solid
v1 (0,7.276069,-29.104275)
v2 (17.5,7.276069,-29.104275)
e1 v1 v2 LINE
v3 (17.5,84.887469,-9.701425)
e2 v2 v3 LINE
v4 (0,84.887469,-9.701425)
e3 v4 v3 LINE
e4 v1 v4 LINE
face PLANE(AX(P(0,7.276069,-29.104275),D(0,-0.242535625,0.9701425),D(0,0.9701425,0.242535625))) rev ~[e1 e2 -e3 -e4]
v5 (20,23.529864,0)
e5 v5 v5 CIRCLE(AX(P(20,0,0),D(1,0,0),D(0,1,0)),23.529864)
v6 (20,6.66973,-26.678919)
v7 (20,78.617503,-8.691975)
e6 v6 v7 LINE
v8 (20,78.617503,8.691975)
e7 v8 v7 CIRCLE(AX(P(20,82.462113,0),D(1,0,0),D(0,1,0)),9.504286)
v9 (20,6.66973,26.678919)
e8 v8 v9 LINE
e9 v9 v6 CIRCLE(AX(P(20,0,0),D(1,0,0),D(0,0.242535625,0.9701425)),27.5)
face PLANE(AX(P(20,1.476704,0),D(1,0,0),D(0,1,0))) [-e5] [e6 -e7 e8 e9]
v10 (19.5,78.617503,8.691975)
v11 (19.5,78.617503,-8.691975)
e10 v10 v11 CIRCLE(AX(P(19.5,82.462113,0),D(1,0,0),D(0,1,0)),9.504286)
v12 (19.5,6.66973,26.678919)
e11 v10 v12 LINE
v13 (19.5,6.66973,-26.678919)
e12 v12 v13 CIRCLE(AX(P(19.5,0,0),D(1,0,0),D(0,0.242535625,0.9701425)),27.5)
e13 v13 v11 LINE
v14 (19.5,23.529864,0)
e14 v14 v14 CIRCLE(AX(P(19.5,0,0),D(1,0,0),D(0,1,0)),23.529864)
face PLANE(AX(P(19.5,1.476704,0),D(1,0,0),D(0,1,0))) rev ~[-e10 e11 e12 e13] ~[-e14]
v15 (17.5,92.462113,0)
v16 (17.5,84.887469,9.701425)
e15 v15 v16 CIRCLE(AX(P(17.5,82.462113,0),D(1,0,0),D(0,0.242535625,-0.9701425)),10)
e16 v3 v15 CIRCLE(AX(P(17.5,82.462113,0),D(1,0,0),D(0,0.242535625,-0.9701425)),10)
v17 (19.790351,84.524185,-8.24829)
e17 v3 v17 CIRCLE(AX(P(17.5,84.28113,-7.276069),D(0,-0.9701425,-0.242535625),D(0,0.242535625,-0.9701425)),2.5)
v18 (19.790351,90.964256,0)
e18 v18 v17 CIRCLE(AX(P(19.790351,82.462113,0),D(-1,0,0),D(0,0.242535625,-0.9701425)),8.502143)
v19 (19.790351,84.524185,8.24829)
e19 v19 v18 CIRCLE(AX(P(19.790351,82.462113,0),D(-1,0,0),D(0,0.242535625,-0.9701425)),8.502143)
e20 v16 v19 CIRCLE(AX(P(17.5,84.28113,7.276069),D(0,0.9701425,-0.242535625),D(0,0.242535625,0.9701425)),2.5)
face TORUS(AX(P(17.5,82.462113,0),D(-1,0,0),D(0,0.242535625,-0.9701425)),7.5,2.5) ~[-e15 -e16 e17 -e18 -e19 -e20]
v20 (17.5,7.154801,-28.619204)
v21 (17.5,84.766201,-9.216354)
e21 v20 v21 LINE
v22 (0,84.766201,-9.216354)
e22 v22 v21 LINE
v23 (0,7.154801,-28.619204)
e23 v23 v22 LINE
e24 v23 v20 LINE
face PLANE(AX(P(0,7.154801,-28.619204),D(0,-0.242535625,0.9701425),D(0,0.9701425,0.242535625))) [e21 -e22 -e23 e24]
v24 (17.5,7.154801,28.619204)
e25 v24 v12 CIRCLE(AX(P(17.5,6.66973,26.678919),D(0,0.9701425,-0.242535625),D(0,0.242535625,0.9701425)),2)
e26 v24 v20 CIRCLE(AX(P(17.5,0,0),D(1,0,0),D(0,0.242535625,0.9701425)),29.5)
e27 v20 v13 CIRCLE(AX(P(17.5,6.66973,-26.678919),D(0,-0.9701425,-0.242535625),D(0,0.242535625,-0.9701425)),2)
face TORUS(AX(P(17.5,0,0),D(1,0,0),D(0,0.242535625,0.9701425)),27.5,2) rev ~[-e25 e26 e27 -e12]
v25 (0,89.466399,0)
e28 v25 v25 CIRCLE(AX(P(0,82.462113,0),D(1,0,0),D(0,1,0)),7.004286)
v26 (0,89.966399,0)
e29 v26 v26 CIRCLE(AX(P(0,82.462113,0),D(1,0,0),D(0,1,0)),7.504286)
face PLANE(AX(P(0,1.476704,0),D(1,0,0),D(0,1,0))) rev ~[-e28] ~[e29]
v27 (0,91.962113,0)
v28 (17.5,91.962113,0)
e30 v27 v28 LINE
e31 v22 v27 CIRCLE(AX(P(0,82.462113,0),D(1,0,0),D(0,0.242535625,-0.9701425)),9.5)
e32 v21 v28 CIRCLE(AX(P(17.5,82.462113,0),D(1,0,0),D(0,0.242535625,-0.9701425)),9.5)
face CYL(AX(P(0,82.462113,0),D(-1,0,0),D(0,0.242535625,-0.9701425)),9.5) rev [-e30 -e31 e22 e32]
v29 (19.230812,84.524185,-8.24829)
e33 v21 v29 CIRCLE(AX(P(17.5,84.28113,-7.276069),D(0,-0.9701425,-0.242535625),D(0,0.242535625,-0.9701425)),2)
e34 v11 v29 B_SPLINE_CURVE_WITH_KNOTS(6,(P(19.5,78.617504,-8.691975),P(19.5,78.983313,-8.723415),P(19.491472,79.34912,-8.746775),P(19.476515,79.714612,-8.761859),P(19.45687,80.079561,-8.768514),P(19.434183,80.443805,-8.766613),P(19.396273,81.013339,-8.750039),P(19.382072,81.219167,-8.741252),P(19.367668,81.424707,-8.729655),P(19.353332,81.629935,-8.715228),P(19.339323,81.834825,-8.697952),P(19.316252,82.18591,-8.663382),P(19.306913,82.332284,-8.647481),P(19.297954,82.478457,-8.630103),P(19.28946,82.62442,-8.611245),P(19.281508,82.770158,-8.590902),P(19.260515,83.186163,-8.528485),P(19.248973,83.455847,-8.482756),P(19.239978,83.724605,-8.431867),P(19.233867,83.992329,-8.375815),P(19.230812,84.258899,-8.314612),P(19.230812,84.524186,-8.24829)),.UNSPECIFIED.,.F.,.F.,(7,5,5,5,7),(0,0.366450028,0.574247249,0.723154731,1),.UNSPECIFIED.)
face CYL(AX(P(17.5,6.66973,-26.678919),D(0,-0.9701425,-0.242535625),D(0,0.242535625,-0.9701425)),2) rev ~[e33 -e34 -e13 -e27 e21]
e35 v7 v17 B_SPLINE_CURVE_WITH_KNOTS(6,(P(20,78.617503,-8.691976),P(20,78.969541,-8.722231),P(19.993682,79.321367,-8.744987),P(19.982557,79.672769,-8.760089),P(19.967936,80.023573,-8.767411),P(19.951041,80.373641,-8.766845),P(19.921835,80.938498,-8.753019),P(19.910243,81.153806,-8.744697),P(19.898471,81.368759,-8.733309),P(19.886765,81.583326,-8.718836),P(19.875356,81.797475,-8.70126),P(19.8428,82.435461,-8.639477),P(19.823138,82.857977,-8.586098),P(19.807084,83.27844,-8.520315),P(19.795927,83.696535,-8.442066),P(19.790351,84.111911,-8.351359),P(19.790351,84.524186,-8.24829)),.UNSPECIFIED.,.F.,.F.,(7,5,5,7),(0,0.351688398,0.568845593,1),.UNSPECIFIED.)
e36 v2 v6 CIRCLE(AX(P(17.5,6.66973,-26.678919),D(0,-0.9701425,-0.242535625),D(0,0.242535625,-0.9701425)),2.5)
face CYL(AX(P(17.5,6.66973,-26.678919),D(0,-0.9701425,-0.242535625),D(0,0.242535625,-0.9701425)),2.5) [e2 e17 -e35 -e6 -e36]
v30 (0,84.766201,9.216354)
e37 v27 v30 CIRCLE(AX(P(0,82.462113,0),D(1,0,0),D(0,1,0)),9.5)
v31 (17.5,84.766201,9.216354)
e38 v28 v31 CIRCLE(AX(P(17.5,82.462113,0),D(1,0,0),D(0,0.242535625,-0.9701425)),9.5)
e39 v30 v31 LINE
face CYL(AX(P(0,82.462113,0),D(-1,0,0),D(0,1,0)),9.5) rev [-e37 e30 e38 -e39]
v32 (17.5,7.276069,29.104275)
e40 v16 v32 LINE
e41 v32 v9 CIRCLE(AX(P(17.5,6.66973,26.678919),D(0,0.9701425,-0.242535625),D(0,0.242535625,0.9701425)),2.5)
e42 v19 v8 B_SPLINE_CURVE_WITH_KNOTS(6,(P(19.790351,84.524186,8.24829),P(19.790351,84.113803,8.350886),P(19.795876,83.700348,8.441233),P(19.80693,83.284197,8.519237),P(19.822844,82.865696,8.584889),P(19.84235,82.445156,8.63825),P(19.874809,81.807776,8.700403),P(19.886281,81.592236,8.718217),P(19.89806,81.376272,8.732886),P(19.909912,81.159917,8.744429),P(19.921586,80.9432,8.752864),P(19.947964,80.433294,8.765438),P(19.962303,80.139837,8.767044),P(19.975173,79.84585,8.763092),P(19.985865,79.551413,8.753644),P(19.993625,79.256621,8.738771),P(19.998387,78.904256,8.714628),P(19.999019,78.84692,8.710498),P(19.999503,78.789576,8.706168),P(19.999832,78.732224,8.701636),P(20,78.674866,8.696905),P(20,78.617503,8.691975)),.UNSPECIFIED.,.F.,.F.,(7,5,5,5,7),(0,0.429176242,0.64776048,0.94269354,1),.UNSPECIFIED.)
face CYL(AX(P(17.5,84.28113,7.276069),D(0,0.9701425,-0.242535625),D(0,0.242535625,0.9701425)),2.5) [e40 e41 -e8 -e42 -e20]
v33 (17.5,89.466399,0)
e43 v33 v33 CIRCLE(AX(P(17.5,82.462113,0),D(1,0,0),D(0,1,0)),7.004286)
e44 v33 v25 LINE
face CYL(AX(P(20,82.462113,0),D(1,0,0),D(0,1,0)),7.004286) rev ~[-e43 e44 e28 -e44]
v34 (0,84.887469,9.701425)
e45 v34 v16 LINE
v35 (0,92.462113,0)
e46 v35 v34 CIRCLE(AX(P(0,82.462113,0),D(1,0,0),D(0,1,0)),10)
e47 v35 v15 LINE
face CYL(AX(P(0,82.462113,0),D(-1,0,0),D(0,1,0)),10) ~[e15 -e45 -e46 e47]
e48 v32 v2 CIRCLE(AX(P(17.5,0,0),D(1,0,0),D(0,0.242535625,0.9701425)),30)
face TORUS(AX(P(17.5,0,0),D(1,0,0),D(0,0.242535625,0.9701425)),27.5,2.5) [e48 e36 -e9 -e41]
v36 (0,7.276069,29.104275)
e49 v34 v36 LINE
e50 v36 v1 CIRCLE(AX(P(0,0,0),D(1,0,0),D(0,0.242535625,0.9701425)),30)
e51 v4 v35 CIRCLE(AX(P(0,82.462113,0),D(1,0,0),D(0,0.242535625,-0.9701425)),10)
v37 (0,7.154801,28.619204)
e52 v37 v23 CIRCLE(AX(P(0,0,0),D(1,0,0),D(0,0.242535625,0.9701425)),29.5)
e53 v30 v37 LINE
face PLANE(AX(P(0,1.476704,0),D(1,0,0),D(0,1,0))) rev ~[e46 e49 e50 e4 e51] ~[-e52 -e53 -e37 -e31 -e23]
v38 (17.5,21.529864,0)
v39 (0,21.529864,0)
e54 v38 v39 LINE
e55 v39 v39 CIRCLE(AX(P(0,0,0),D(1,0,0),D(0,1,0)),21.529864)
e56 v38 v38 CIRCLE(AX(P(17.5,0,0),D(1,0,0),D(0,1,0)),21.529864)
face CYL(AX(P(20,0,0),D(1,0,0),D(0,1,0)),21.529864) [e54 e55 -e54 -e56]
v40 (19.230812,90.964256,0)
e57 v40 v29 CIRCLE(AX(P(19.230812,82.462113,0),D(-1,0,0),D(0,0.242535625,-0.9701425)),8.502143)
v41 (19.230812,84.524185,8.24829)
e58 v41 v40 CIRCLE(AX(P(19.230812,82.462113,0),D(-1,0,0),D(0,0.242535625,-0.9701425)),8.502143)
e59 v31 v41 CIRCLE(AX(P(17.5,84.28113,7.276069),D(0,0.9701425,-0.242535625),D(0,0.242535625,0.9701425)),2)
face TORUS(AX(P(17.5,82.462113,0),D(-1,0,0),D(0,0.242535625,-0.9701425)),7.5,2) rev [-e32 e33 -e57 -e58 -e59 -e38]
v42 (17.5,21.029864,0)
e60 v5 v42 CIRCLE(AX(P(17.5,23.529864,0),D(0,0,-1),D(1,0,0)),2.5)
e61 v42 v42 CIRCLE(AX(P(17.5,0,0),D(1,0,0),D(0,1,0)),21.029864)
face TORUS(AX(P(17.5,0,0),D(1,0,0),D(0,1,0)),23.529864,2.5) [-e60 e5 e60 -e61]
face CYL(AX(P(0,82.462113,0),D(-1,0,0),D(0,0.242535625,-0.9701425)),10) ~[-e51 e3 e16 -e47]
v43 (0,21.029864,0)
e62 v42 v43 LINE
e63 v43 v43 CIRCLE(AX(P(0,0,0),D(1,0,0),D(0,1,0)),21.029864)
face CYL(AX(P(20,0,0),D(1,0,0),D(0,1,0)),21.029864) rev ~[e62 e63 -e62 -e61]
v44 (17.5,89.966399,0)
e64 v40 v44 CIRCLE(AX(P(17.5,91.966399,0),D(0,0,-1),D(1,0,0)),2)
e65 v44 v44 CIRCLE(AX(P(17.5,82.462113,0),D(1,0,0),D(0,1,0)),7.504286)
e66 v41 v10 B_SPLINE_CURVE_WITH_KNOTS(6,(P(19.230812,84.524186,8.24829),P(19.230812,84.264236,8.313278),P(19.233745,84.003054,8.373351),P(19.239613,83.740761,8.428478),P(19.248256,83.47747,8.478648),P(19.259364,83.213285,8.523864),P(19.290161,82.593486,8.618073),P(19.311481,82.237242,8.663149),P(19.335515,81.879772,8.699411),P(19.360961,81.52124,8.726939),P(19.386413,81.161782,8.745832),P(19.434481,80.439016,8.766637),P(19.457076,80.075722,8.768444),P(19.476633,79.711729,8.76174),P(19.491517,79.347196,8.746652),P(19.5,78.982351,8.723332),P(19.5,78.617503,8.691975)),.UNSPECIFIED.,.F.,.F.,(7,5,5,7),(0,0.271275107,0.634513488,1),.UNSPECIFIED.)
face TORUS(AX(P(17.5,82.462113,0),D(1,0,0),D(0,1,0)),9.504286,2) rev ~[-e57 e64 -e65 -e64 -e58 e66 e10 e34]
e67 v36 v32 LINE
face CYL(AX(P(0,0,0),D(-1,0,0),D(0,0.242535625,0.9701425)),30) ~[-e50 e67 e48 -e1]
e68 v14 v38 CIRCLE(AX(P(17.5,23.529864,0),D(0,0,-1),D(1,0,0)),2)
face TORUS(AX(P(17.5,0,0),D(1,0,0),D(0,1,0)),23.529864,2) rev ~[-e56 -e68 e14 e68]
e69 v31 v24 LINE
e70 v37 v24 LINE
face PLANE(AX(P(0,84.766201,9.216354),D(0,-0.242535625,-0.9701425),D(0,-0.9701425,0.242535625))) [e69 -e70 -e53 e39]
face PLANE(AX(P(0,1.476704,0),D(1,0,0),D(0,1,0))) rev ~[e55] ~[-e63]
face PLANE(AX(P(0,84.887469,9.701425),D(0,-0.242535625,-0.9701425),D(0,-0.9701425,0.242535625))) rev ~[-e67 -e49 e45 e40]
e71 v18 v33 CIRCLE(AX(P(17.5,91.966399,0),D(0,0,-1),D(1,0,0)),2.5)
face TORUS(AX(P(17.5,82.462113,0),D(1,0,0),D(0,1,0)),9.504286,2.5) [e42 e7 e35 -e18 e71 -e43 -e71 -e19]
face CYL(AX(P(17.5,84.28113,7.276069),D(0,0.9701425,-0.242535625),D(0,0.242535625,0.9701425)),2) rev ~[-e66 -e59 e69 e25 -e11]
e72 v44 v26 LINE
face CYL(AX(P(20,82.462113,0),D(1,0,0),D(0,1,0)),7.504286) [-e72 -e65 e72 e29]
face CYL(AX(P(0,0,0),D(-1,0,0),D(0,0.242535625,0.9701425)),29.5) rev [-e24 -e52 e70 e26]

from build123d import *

# Parameters (mm, degrees)
F1_DEPTH    = 20
F2_R        = 7.0042863138
F2_R_2      = 21.0298639767
F3_DEPTH    = 20
F4_T1_DEPTH = 80
F4_T3_DEPTH = 80
F4_T6_ANGLE = 208.0724869359
F4_T8_ANGLE = 151.9275130641
F5_T        = -0.5


# Not quite as in the source:
# - a fillet or chamfer that OpenCascade refuses, or shapes differently, is made with other operations: its cross-section is extruded or revolved along the edge and cut away or added


with BuildPart() as f1:
    # F0 (on Right) → F1 (new body)
    with BuildSketch(Plane.YZ):
        with BuildLine():
            ThreePointArc((7.2760687511, -29.1042750044), (23.6461631405, -18.4623662821), (30, 0))
            ThreePointArc((30, 0), (23.6461631405, 18.4623662821), (7.2760687511, 29.1042750044))
            ThreePointArc((7.2760687511, 29.1042750044), (-30, 0), (7.2760687511, -29.1042750044))
        make_face()
        with BuildLine():
            ThreePointArc((7.2760687511, 29.1042750044), (23.6461631405, 18.4623662821), (30, 0))
            ThreePointArc((30, 0), (23.6461631405, -18.4623662821), (7.2760687511, -29.1042750044))
            Line((7.2760687511, -29.1042750044), (84.8874687627, -9.7014250015))
            ThreePointArc((84.8874687627, -9.7014250015), (72.4621125124, 0), (84.8874687627, 9.7014250015))
            Line((84.8874687627, 9.7014250015), (7.2760687511, 29.1042750044))
        make_face()
        with BuildLine():
            ThreePointArc((92.4621125124, 0), (90.3441668925, 6.154122094), (84.8874687627, 9.7014250015))
            ThreePointArc((84.8874687627, 9.7014250015), (72.4621125124, 0), (84.8874687627, -9.7014250015))
            ThreePointArc((84.8874687627, -9.7014250015), (90.3441668925, -6.154122094), (92.4621125124, 0))
        make_face()
    extrude(amount=F1_DEPTH)

    # F2 (on face) → F3 (cut)
    with BuildSketch(Plane.YZ.offset(20)):
        with Locations((82.4621125124, 0)):
            Circle(F2_R)
        Circle(F2_R_2)
    extrude(amount=-F3_DEPTH, mode=Mode.SUBTRACT)

    # F4: fillet of radius 2.5 on 6 edges, made by hand

    # F4_s2 → F4_t1 (cut)
    with BuildSketch(Plane(origin=(0, 77.6114000116, -19.4028500029), x_dir=(1, 0, 0), z_dir=(0, -0.9701425001, 0.242535625))):
        with BuildLine():
            ThreePointArc((17.5, 30), (19.267766953, 29.267766953), (20, 27.5))
            Line((20, 27.5), (20, 30))
            Line((20, 30), (17.5, 30))
        make_face()
    extrude(amount=F4_T1_DEPTH, mode=Mode.SUBTRACT)

    # F4_s4 → F4_t3 (cut)
    with BuildSketch(Plane(origin=(0, 0, 0), x_dir=(1, 0, 0), z_dir=(0, 0.9701425001, 0.242535625))):
        with BuildLine():
            ThreePointArc((17.5, 30), (19.267766953, 29.267766953), (20, 27.5))
            Line((20, 27.5), (20, 30))
            Line((20, 30), (17.5, 30))
        make_face()
    extrude(amount=F4_T3_DEPTH, mode=Mode.SUBTRACT)

    # F4_s5 → F4_t6 (revolve, cut)
    with BuildSketch(Plane(origin=(0, 0, 0), x_dir=(1, 0, 0), z_dir=(0, 0.9701425001, -0.242535625))):
        with BuildLine():
            ThreePointArc((17.5, -30), (19.267766953, -29.267766953), (20, -27.5))
            Line((20, -27.5), (20, -30))
            Line((20, -30), (17.5, -30))
        make_face()
    revolve(axis=Axis((20, 0, 0), (1, 0, 0)), revolution_arc=F4_T6_ANGLE, mode=Mode.SUBTRACT)

    # F4_s7 → F4_t8 (revolve, cut)
    with BuildSketch(Plane(origin=(0, 77.6114000116, 19.4028500029), x_dir=(1, 0, 0), z_dir=(0, -0.9701425001, -0.242535625))):
        with BuildLine():
            ThreePointArc((20, -27.5), (19.267766953, -29.267766953), (17.5, -30))
            Line((17.5, -30), (20, -30))
            Line((20, -30), (20, -27.5))
        make_face()
    revolve(axis=Axis((20, 82.4621125124, 0), (1, 0, 0)), revolution_arc=F4_T8_ANGLE, mode=Mode.SUBTRACT)

    # F4_s9 → F4_t10 (revolve, cut)
    with BuildSketch(Plane.XY):
        with BuildLine():
            ThreePointArc((20, 23.5298639767), (19.267766953, 21.7620970238), (17.5, 21.0298639767))
            Line((17.5, 21.0298639767), (20, 21.0298639767))
            Line((20, 21.0298639767), (20, 23.5298639767))
        make_face()
    revolve(axis=Axis((20, 0, 0), (1, 0, 0)), mode=Mode.SUBTRACT)

    # F4_s11 → F4_t12 (revolve, cut)
    with BuildSketch(Plane.XY):
        with BuildLine():
            ThreePointArc((20, 91.9663988262), (19.267766953, 90.1986318732), (17.5, 89.4663988262))
            Line((17.5, 89.4663988262), (20, 89.4663988262))
            Line((20, 89.4663988262), (20, 91.9663988262))
        make_face()
    revolve(axis=Axis((20, 82.4621125124, 0), (1, 0, 0)), mode=Mode.SUBTRACT)

    # F5
    f5_openings = [f1.faces().sort_by_distance(p)[0] for p in [
        (0, 29.143198, 0),
    ]]
    offset(amount=F5_T, openings=f5_openings)


solid = f1.part
